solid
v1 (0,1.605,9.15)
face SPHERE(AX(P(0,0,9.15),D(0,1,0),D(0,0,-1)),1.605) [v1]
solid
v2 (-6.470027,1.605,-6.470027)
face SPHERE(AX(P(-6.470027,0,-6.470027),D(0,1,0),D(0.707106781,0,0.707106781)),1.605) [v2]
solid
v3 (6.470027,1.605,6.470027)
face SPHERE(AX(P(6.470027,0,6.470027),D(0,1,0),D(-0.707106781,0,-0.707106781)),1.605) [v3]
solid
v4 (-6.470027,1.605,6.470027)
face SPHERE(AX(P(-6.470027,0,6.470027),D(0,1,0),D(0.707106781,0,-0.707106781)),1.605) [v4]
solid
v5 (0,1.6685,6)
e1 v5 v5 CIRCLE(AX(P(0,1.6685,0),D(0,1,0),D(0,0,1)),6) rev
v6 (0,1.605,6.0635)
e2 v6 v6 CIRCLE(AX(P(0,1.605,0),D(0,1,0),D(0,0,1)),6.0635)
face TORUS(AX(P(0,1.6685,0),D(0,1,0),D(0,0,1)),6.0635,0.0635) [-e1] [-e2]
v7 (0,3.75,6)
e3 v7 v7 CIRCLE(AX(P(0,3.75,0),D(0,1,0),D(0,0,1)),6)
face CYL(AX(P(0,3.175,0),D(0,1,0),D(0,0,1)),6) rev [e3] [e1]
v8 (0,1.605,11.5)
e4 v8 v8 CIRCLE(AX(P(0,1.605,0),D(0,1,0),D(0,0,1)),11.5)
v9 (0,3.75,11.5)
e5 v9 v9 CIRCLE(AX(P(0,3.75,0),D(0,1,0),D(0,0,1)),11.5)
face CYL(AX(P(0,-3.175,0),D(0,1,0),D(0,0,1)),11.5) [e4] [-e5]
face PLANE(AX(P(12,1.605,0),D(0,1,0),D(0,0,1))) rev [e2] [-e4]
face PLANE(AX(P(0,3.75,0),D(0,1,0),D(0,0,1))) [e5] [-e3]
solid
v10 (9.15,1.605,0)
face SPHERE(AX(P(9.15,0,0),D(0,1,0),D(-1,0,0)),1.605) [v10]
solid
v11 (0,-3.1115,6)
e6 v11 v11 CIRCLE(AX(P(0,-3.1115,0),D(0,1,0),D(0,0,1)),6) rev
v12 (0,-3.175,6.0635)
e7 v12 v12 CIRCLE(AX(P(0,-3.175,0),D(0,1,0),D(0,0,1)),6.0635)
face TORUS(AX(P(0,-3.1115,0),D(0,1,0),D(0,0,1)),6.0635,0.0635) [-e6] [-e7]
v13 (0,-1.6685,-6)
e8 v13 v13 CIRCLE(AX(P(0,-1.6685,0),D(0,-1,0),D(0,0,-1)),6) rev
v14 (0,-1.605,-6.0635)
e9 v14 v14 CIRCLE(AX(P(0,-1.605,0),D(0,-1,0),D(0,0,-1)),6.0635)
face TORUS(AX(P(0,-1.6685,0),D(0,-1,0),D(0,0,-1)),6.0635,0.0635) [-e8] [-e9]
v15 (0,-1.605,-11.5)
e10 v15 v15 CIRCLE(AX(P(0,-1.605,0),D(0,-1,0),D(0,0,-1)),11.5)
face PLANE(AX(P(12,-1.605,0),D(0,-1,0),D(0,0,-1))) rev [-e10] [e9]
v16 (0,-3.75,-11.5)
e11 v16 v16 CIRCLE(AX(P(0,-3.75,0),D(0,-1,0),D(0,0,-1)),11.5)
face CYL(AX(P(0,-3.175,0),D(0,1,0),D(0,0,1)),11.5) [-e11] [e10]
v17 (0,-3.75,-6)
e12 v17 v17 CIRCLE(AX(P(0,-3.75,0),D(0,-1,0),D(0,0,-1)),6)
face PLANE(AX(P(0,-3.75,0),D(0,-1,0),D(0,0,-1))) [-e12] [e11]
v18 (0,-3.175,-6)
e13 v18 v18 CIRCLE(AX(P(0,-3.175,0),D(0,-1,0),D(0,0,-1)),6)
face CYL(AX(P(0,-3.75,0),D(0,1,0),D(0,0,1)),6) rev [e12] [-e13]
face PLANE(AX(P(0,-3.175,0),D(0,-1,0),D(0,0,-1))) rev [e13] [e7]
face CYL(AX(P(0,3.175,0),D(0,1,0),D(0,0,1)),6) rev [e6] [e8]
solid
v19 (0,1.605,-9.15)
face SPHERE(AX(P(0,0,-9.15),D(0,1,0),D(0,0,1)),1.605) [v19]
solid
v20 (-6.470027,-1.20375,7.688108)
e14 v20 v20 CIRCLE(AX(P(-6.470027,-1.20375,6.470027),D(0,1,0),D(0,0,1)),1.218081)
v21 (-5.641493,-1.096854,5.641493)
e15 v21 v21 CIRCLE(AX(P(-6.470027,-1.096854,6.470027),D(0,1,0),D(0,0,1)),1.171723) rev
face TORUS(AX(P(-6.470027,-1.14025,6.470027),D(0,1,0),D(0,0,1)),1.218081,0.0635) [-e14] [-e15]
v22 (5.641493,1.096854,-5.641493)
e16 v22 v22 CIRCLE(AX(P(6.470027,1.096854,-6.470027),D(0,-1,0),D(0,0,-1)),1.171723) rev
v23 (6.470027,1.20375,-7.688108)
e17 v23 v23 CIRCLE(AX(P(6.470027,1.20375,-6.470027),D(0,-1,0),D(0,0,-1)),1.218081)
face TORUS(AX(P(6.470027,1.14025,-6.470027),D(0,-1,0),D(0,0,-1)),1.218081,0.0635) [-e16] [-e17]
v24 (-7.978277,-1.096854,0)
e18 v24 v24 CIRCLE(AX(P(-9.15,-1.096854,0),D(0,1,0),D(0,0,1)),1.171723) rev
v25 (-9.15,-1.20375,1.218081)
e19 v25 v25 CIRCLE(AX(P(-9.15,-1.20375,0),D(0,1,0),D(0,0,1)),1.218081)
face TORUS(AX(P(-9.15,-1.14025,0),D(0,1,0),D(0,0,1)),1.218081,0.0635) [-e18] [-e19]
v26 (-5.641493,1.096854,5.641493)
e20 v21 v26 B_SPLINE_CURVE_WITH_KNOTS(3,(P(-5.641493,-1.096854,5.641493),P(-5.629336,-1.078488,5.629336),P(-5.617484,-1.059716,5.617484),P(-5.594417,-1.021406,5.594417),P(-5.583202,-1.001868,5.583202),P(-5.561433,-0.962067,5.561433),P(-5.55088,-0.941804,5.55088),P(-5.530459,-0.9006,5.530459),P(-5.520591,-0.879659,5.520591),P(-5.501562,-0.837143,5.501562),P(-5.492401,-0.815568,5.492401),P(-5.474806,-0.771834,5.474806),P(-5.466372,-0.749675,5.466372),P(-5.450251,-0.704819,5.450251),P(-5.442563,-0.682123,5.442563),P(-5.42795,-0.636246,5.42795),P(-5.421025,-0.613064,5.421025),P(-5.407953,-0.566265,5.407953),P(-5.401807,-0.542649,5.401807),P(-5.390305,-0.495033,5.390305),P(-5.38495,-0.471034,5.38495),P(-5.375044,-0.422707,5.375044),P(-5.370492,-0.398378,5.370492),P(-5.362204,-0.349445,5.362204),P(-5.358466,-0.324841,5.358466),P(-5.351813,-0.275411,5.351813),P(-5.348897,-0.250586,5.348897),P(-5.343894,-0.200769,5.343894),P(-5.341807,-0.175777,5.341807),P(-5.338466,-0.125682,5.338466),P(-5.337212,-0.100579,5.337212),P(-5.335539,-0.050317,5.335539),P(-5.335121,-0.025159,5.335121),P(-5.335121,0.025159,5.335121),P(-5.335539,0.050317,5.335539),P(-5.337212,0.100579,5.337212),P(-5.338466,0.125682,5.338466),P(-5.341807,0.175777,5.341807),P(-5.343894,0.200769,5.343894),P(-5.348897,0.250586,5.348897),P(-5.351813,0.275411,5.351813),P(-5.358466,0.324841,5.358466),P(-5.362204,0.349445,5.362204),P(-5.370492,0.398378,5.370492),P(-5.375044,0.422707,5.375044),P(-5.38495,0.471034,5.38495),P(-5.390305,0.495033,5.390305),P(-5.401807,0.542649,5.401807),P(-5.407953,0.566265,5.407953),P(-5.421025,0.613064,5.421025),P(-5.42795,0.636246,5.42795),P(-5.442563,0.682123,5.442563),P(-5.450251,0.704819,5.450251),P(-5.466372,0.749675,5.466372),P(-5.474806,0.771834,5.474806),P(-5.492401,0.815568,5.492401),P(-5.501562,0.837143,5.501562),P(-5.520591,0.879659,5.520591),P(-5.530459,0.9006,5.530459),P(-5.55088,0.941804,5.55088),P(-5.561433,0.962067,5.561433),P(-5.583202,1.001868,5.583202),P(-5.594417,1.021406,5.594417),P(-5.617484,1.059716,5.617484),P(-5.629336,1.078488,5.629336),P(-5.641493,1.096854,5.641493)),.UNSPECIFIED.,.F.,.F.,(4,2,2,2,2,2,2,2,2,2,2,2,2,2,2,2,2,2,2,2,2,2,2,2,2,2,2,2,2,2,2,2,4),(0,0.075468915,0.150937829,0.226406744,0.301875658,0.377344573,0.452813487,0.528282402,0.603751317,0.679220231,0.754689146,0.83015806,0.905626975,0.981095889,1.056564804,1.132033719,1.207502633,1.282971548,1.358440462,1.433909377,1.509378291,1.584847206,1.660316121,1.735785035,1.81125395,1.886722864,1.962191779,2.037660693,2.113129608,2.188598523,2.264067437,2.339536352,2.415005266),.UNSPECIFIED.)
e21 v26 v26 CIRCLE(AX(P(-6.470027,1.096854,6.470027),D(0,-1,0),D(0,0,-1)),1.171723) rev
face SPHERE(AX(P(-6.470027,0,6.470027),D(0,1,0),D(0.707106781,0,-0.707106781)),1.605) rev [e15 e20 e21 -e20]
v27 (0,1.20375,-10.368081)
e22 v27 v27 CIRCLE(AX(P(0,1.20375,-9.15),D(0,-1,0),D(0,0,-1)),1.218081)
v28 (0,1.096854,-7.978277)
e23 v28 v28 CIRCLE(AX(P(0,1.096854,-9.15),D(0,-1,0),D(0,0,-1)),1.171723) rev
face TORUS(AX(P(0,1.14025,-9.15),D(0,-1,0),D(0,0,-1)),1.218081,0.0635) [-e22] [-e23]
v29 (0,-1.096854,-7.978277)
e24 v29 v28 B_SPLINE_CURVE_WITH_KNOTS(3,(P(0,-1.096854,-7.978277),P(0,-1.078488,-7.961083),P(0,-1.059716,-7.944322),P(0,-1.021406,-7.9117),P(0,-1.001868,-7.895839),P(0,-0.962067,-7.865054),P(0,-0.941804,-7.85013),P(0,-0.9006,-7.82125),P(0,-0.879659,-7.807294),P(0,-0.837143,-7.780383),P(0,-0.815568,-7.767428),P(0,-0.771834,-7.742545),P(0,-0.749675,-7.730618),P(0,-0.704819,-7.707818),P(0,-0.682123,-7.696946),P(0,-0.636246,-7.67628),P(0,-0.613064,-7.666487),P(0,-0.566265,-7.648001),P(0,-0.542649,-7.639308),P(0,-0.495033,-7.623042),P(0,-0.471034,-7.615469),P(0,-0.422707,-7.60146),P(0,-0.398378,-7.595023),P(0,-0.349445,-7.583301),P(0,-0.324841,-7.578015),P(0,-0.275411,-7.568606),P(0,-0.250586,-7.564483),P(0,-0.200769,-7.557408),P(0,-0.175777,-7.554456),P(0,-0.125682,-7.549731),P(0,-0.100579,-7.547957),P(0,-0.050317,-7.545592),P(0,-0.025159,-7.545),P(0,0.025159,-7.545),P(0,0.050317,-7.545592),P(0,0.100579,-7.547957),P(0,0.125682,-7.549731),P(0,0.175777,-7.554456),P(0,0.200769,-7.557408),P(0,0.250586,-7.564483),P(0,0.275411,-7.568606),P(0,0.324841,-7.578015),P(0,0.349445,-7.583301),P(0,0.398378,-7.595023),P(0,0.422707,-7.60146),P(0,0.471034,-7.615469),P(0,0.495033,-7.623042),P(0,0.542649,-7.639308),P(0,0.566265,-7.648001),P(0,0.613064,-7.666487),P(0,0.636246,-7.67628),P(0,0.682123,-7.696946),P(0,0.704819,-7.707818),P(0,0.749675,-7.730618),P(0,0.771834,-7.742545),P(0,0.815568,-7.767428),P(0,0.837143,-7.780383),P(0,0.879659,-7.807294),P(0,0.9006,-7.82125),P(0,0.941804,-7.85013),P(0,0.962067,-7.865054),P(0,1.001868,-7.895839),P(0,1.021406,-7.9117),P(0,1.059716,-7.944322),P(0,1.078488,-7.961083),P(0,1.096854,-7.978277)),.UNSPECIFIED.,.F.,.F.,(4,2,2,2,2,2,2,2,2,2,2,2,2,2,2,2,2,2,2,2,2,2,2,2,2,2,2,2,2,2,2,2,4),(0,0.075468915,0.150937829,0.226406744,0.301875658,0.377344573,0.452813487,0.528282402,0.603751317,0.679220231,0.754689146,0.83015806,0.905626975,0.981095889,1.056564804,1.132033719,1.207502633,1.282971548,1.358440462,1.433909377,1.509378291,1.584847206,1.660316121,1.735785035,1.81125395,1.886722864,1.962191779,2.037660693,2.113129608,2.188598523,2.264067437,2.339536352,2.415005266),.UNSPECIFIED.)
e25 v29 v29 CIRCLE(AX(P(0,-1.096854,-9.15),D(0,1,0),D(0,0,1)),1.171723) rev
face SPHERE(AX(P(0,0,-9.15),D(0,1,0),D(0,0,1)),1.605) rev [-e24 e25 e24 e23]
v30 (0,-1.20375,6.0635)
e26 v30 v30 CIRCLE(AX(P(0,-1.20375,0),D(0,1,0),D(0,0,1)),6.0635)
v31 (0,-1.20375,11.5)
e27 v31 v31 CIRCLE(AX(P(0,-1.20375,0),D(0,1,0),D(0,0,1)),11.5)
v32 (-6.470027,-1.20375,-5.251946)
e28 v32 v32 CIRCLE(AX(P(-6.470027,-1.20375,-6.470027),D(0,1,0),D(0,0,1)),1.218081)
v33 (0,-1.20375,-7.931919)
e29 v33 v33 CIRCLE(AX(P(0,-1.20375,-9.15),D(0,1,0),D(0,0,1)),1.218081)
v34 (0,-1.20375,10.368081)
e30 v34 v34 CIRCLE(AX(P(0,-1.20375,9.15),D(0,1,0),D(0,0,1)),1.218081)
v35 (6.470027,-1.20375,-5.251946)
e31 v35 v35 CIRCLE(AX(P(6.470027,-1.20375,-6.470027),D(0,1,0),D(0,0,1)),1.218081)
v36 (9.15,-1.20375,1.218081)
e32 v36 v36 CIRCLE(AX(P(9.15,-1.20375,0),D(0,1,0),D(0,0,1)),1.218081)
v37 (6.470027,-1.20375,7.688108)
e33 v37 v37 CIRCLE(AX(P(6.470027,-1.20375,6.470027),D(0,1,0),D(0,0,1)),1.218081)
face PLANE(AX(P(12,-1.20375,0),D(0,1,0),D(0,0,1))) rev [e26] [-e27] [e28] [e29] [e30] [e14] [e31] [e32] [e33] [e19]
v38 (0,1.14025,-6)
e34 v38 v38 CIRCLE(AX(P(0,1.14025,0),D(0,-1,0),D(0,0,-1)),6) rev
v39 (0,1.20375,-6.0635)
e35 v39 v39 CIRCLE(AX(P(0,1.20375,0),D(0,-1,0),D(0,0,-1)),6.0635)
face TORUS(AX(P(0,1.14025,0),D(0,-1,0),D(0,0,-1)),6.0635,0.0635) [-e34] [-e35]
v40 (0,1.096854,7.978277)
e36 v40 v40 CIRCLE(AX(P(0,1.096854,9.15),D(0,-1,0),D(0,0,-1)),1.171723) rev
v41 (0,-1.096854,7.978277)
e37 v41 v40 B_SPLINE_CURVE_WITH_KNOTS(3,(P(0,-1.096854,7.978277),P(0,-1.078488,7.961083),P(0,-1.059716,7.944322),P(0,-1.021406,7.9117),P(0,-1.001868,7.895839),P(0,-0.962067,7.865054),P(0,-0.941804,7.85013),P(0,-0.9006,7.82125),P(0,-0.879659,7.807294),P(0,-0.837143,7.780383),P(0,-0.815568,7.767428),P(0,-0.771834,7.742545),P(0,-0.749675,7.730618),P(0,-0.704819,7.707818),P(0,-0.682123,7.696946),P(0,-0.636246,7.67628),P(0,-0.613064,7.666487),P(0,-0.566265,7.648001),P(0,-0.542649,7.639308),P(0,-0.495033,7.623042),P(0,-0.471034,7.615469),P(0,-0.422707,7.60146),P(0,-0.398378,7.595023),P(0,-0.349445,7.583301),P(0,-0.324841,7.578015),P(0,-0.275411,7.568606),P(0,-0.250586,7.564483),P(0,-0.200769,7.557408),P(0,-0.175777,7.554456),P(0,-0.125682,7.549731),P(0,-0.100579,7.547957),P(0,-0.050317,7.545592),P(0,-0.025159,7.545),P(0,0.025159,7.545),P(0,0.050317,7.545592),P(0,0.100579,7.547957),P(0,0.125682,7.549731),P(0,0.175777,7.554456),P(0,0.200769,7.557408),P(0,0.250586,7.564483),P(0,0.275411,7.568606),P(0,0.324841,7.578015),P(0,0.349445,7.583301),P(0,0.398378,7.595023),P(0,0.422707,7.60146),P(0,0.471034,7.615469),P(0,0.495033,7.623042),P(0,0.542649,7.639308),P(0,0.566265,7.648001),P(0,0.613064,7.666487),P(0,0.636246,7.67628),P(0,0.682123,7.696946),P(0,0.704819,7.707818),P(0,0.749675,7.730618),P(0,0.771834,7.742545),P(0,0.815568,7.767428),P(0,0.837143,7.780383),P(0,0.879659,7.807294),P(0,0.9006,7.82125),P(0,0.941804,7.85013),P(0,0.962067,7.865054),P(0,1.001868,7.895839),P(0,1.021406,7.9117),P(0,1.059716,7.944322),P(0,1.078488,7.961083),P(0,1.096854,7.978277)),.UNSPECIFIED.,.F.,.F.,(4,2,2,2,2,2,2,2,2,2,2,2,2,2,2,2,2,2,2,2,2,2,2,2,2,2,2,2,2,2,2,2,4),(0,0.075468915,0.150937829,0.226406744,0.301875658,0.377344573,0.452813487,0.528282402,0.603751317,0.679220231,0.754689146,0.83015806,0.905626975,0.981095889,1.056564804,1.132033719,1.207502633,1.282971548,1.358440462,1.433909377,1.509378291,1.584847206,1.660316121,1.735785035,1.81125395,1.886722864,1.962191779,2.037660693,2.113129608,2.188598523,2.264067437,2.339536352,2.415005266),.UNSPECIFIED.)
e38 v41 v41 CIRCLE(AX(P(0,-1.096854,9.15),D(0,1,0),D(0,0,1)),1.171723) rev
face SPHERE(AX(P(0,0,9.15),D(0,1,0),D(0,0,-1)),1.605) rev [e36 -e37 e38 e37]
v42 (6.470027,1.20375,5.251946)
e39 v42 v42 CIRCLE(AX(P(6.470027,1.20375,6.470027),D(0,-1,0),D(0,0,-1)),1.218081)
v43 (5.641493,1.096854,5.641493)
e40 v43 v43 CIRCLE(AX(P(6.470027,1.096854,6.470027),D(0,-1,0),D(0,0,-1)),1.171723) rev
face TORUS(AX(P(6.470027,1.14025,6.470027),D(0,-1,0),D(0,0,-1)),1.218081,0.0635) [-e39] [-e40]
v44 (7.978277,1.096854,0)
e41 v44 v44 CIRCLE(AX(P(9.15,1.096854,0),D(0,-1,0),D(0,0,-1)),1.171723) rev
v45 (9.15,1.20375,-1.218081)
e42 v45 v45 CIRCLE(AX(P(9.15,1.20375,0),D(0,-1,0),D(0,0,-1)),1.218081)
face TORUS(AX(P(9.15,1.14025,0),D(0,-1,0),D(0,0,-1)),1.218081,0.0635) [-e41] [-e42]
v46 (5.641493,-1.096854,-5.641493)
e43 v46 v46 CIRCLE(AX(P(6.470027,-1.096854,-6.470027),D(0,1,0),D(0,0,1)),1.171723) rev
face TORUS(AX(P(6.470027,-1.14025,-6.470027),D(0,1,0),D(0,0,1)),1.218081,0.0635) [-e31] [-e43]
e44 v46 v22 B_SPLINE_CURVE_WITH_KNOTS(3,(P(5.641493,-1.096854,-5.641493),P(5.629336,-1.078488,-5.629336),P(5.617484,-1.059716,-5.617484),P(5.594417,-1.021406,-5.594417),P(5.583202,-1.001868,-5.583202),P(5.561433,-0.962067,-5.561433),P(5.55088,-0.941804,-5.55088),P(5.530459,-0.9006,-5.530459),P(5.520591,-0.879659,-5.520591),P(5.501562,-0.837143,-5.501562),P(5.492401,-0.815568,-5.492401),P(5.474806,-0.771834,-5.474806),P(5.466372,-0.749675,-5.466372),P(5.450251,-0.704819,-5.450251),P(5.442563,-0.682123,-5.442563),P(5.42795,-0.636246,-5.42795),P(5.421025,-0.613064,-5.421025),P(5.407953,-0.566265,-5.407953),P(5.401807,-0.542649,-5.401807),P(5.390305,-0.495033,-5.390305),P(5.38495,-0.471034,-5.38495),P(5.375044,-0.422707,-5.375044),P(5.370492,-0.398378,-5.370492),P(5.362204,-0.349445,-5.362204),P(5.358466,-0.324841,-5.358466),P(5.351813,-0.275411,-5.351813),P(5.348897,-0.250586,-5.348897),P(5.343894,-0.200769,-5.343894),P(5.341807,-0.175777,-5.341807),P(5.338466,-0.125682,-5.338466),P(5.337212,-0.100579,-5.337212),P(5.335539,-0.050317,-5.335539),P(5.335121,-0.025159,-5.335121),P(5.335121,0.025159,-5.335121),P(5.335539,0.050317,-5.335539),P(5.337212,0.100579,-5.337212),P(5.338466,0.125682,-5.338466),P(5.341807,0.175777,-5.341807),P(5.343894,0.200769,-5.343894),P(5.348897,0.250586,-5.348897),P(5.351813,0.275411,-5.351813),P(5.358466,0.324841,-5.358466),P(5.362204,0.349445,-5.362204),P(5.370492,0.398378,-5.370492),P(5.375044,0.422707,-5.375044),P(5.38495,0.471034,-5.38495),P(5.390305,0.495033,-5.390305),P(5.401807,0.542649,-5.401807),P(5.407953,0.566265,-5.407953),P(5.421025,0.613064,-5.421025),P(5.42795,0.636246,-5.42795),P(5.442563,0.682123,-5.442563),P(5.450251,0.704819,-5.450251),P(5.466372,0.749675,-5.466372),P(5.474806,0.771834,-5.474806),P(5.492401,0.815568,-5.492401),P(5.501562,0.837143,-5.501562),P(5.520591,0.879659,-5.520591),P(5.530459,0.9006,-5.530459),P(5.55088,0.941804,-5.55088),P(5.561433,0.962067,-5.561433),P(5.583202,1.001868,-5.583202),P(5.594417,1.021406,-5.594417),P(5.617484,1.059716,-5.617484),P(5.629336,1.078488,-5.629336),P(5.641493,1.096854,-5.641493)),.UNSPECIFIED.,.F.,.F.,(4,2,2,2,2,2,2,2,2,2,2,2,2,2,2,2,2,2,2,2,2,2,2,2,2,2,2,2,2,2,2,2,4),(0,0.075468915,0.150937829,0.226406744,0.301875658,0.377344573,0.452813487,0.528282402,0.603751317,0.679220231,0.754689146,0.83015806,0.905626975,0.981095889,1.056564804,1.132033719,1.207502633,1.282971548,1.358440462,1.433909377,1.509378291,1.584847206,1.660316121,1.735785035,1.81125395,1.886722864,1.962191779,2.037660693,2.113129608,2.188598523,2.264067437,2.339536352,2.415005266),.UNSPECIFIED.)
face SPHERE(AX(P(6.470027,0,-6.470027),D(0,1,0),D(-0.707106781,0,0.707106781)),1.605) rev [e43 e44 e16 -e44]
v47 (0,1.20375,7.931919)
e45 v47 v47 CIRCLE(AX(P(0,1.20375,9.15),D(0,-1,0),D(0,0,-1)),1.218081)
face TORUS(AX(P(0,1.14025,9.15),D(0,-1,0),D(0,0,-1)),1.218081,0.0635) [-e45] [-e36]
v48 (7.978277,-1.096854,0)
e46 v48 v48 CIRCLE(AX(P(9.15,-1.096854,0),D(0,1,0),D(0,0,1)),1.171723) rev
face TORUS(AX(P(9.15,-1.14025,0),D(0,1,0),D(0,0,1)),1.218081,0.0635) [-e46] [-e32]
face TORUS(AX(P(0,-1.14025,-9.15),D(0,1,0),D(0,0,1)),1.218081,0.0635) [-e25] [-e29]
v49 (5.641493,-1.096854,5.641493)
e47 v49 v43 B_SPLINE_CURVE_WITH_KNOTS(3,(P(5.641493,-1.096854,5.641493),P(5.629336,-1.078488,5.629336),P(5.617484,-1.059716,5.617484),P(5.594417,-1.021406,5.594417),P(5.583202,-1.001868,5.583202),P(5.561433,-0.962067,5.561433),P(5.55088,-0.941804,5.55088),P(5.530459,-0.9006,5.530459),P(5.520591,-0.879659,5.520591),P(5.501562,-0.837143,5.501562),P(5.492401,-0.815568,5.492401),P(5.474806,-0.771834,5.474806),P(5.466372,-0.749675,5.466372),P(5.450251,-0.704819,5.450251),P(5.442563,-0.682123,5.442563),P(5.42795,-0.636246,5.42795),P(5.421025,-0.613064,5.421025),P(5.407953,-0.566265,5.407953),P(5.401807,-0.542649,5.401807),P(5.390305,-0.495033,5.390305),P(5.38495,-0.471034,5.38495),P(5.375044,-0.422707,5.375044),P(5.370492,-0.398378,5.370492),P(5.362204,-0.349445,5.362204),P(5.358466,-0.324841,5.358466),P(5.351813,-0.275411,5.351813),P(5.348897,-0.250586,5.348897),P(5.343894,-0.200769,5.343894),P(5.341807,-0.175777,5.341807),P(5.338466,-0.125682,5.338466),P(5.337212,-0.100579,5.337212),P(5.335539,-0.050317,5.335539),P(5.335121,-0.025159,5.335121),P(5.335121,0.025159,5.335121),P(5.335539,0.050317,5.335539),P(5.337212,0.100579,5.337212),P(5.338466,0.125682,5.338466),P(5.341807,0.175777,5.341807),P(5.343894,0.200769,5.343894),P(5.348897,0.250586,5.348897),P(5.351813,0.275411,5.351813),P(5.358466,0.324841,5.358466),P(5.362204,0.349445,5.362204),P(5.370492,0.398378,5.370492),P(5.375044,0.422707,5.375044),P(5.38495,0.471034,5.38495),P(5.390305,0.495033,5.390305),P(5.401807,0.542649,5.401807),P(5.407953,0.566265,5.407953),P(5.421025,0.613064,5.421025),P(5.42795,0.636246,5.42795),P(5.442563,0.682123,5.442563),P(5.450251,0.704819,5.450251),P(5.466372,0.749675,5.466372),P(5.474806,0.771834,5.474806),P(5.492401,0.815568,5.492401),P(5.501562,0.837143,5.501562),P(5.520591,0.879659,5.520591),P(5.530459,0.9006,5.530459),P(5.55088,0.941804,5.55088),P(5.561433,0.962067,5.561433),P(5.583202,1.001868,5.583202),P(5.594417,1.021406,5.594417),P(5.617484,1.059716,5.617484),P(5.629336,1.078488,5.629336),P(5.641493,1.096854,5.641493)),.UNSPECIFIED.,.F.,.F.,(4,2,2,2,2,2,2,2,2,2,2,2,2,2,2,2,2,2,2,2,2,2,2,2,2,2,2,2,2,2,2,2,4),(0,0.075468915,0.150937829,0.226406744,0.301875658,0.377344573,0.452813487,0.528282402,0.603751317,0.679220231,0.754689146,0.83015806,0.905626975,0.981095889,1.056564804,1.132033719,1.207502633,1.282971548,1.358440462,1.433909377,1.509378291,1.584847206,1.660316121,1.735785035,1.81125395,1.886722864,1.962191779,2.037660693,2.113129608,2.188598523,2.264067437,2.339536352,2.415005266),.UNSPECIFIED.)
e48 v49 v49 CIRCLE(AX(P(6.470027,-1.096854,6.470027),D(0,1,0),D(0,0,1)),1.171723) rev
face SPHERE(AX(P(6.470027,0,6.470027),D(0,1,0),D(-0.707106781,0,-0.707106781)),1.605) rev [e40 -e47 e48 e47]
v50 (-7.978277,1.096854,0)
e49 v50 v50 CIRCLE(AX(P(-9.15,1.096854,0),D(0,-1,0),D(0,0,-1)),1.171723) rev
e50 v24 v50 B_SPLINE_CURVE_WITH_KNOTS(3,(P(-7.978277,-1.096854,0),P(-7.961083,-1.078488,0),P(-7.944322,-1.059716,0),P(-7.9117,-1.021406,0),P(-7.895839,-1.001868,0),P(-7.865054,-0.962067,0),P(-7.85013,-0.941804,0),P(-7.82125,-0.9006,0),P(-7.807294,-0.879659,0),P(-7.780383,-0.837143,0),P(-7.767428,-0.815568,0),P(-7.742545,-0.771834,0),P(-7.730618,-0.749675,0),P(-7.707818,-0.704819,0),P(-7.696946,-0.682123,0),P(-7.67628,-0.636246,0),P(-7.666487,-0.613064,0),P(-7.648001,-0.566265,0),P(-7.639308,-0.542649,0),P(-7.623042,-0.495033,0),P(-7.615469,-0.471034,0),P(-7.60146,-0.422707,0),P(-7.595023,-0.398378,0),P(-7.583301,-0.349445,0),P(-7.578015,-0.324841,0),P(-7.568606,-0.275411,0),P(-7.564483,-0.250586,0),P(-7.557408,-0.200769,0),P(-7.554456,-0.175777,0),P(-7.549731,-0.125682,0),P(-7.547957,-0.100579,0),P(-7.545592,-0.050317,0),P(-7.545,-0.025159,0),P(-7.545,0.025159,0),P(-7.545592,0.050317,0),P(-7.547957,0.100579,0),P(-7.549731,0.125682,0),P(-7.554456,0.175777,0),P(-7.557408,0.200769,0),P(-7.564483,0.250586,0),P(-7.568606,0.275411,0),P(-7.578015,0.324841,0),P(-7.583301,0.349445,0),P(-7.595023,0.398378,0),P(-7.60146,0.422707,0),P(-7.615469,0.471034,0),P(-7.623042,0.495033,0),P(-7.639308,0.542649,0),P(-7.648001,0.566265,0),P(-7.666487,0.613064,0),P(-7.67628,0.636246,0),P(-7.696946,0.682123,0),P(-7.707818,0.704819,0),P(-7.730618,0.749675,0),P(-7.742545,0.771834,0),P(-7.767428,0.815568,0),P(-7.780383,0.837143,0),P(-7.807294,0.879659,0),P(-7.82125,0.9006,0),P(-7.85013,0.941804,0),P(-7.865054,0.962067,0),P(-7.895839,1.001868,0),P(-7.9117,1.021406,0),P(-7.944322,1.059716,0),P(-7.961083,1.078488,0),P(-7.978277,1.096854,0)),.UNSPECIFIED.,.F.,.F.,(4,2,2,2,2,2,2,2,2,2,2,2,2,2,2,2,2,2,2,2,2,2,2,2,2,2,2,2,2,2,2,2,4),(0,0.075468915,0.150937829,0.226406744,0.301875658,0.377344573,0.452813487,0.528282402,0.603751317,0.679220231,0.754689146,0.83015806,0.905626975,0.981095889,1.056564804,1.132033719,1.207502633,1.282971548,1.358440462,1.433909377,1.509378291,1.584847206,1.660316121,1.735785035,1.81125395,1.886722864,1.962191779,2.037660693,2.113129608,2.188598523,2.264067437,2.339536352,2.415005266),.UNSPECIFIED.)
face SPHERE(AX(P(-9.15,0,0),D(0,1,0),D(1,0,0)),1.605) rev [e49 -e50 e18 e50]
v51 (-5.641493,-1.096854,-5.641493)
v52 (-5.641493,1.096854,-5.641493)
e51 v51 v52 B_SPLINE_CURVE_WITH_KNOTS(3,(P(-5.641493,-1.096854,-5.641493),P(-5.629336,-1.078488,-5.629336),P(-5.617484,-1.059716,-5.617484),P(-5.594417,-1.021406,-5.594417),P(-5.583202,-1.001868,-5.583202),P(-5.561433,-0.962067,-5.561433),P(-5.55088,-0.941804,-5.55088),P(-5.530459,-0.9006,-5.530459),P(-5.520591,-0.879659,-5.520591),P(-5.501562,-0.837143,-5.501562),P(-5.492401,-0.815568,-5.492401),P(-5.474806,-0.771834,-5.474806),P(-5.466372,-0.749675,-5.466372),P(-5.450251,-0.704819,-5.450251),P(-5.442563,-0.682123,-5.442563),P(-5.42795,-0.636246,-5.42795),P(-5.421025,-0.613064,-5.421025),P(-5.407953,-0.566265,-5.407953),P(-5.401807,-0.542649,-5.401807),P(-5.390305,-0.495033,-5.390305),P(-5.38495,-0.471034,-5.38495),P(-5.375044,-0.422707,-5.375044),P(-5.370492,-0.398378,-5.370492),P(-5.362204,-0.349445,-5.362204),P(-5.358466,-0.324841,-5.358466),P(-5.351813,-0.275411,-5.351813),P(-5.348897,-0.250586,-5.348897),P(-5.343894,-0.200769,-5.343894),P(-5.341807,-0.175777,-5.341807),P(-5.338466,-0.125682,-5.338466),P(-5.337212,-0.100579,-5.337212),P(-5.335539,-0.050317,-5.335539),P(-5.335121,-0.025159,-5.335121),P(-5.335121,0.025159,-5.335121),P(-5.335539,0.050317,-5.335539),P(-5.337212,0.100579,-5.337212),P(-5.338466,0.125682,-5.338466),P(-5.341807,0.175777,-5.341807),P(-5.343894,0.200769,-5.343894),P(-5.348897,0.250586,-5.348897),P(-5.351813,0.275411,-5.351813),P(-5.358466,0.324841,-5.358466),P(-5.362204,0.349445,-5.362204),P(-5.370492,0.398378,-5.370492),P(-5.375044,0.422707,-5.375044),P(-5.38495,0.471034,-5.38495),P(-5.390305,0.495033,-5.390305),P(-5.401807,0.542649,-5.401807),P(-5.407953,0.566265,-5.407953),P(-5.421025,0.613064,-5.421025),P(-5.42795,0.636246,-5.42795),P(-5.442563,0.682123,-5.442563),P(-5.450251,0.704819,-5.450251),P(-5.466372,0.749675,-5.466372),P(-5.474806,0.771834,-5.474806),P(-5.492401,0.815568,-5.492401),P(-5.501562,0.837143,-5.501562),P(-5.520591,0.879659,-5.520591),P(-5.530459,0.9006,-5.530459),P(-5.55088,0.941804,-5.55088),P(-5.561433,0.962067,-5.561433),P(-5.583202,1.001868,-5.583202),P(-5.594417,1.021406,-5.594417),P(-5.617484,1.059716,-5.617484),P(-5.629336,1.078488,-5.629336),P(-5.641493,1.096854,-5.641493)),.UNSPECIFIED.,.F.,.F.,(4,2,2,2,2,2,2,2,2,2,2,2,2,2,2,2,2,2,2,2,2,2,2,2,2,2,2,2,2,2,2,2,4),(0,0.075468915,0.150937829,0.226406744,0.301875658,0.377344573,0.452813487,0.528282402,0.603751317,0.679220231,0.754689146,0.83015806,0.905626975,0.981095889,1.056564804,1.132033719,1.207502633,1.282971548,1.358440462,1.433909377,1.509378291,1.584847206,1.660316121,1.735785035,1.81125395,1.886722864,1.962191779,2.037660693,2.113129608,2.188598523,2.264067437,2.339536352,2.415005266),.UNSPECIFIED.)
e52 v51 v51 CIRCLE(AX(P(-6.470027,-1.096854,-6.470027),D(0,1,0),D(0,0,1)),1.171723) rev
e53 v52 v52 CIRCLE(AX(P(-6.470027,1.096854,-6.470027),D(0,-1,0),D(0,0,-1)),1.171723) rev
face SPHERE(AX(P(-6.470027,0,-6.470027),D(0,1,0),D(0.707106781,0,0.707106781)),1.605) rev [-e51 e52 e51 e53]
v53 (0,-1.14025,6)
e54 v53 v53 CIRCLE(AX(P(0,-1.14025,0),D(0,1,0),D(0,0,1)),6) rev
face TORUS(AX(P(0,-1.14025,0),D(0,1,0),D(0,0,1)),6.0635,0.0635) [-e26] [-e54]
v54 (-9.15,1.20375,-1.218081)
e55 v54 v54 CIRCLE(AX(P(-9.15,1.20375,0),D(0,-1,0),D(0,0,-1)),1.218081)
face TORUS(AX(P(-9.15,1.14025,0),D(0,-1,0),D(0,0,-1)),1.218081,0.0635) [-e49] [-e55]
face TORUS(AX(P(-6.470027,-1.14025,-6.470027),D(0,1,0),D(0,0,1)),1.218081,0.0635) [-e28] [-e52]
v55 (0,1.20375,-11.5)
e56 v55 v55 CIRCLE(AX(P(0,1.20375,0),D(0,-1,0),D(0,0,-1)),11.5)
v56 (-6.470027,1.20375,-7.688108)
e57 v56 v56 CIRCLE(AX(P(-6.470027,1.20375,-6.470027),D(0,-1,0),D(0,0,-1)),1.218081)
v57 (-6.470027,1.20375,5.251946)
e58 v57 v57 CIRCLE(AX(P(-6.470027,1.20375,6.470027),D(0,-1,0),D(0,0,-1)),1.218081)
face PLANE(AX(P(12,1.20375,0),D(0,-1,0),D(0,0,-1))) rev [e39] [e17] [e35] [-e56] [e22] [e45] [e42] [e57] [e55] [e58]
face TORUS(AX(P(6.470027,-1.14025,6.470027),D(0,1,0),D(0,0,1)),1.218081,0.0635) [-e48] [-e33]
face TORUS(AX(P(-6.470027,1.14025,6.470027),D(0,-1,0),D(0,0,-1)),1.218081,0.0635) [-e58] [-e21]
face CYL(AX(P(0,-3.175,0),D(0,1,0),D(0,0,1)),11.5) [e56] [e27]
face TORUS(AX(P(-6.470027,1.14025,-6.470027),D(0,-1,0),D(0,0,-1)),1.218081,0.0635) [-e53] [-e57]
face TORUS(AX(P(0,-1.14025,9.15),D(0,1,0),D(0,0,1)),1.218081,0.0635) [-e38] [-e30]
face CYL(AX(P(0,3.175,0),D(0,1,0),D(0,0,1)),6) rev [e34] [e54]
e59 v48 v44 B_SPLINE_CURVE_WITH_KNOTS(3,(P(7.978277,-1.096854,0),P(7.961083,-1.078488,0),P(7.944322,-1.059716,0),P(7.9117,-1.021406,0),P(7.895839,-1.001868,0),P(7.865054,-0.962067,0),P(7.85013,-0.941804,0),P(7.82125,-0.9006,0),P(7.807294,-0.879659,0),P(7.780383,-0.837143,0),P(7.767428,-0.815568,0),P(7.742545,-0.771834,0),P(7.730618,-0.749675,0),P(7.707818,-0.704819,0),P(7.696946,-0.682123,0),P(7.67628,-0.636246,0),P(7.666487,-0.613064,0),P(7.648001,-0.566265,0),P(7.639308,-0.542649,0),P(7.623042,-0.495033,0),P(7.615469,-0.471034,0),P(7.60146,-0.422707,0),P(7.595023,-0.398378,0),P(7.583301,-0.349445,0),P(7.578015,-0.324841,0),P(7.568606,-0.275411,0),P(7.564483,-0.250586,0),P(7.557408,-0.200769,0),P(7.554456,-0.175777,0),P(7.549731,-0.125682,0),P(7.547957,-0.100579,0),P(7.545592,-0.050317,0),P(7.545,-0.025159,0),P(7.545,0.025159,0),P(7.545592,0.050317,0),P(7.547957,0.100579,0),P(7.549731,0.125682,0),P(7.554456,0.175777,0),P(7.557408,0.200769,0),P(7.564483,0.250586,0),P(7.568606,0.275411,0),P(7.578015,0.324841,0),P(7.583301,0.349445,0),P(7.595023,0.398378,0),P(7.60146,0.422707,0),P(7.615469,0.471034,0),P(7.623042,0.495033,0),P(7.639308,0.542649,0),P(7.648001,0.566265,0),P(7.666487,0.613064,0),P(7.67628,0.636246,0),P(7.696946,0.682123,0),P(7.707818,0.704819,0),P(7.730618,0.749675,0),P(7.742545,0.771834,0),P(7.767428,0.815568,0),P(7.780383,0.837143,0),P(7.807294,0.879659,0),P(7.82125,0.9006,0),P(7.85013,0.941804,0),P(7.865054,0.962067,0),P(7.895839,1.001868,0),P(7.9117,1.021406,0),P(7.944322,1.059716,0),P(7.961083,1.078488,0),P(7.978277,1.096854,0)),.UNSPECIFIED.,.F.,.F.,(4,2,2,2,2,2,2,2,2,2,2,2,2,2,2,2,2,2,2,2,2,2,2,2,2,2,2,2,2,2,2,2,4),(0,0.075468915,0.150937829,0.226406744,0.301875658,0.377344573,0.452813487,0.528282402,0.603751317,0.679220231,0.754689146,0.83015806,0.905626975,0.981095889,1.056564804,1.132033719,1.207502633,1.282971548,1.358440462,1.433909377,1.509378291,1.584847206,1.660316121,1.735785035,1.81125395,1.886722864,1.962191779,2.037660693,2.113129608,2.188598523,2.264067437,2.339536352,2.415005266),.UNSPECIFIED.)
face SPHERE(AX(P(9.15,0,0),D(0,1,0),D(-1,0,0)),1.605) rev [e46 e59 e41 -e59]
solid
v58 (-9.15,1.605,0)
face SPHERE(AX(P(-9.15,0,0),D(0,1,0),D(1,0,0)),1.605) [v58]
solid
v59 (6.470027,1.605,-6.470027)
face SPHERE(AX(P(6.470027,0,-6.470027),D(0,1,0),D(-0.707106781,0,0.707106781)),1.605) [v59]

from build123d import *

# Parameters (mm, degrees)
SKETCH3_W                = 6
SKETCH3_H                = 2.4075
CIRPATTERN1_COUNT        = 8
CIRPATTERN1_ANGLE        = 315
CIRPATTERN2_COUNT        = 8
SKETCH6_W                = 6
SKETCH6_H                = 1.57
FILLET1_R                = 0.0635
FILLET2_R                = 0.0635
FILLET3_R                = 0.0635
CUT_EXTRUDE1_DEPTH       = 19.119671798
CUT_EXTRUDE1_DEPTH_BACK  = 19.119671798
SKETCH7_R                = 12.5
SKETCH7_R_2              = 11.5
BOSS_EXTRUDE1_DEPTH      = 0.575
BOSS_EXTRUDE1_DEPTH_BACK = 0.3
SKETCH8_R                = 11.5
SKETCH8_R_2              = 6
SKETCH9_R                = 11.5
SKETCH9_R_2              = 6
BOSS_EXTRUDE2_DEPTH      = 0.575


with BuildPart() as part:
    # Sketch3 → Revolve1 (revolve)
    with BuildSketch(Plane.XY):
        with Locations((9, 0)):
            Rectangle(SKETCH3_W, SKETCH3_H)
    revolve(axis=Axis((0, 3.175, 0), (0, -1, 0)))

    # Sketch4 → Cut-Revolve1 (revolve, cut)
    with BuildSketch(Plane.XY):
        with BuildLine():
            Line((9.15, 1.605), (9.15, -1.605))
            ThreePointArc((9.15, -1.605), (7.545, 0), (9.15, 1.605))
        make_face()
    cut_revolve1 = revolve(axis=Axis((9.15, 1.605, 0), (0, -1, 0)), mode=Mode.SUBTRACT)

    # CirPattern2: Cut-Revolve1 ×8 about axis
    cirpattern2_axis = Axis((0, 3.175, 0), (0, -1, 0))
    for i in range(1, CIRPATTERN2_COUNT):
        add(cut_revolve1.rotate(cirpattern2_axis, i * 360 / CIRPATTERN2_COUNT), mode=Mode.SUBTRACT)

    # Fillet2
    fillet2_edges = [part.edges().sort_by_distance(p)[0] for p in [
        (-6, -1.20375, 0),
        (-12, -1.20375, 0),
        (10.211607714, -1.20375, 0),
        (7.220697061, -1.20375, 7.220697061),
        (0, -1.20375, 10.211607714),
        (-7.220697061, -1.20375, 7.220697061),
        (-10.211607714, -1.20375, 0),
        (-7.220697061, -1.20375, -7.220697061),
        (0, -1.20375, -10.211607714),
        (-12, 1.20375, 0),
        (-6, 1.20375, 0),
        (10.211607714, 1.20375, 0),
        (7.220697061, 1.20375, 7.220697061),
        (0, 1.20375, 10.211607714),
        (-7.220697061, 1.20375, 7.220697061),
        (-10.211607714, 1.20375, 0),
        (-7.220697061, 1.20375, -7.220697061),
        (0, 1.20375, -10.211607714),
        (7.220697061, -1.20375, -7.220697061),
        (7.220697061, 1.20375, -7.220697061),
    ]]
    fillet(fillet2_edges, radius=FILLET2_R)


with BuildPart() as body_2:
    # Sketch5 → Revolve2 (revolve)
    with BuildSketch(Plane.XY):
        with BuildLine():
            Line((9.15, 1.605), (9.15, -1.605))
            ThreePointArc((9.15, -1.605), (7.545, 0), (9.15, 1.605))
        make_face()
    revolve(axis=Axis((9.15, 1.605, 0), (0, -1, 0)))


with BuildPart() as cirpattern1_1:
    # CirPattern1: pattern copy
    add(body_2.part.rotate(Axis((0, 3.175, 0), (0, -1, 0)), 1 * CIRPATTERN1_ANGLE / (CIRPATTERN1_COUNT - 1)))


with BuildPart() as cirpattern1_2:
    # CirPattern1: pattern copy
    add(body_2.part.rotate(Axis((0, 3.175, 0), (0, -1, 0)), 2 * CIRPATTERN1_ANGLE / (CIRPATTERN1_COUNT - 1)))


with BuildPart() as cirpattern1_3:
    # CirPattern1: pattern copy
    add(body_2.part.rotate(Axis((0, 3.175, 0), (0, -1, 0)), 3 * CIRPATTERN1_ANGLE / (CIRPATTERN1_COUNT - 1)))


with BuildPart() as cirpattern1_4:
    # CirPattern1: pattern copy
    add(body_2.part.rotate(Axis((0, 3.175, 0), (0, -1, 0)), 4 * CIRPATTERN1_ANGLE / (CIRPATTERN1_COUNT - 1)))


with BuildPart() as cirpattern1_5:
    # CirPattern1: pattern copy
    add(body_2.part.rotate(Axis((0, 3.175, 0), (0, -1, 0)), 5 * CIRPATTERN1_ANGLE / (CIRPATTERN1_COUNT - 1)))


with BuildPart() as cirpattern1_6:
    # CirPattern1: pattern copy
    add(body_2.part.rotate(Axis((0, 3.175, 0), (0, -1, 0)), 6 * CIRPATTERN1_ANGLE / (CIRPATTERN1_COUNT - 1)))


with BuildPart() as cirpattern1_7:
    # CirPattern1: pattern copy
    add(body_2.part.rotate(Axis((0, 3.175, 0), (0, -1, 0)), 7 * CIRPATTERN1_ANGLE / (CIRPATTERN1_COUNT - 1)))


with BuildPart() as body_10:
    # Sketch6 → Revolve3 (revolve)
    with BuildSketch(Plane.XY):
        with Locations((9, 2.39)):
            Rectangle(SKETCH6_W, SKETCH6_H)
        with Locations((9, -2.39)):
            Rectangle(SKETCH6_W, SKETCH6_H)
    revolve(axis=Axis((0, 3.175, 0), (0, -1, 0)))

    # Fillet1
    fillet1_edges = [body_10.edges().sort_by_distance(p)[0] for p in [
        (-6, 1.605, 0),
        (-12, 1.605, 0),
        (-12, 3.175, 0),
        (-6, 3.175, 0),
    ]]
    fillet(fillet1_edges, radius=FILLET1_R)

    # Fillet3
    fillet3_edges = [body_10.edges().sort_by_distance(p)[0] for p in [
        (-12, -1.605, 0),
        (-6, -1.605, 0),
        (-6, -3.175, 0),
        (-12, -3.175, 0),
    ]]
    fillet(fillet3_edges, radius=FILLET3_R)


with BuildPart() as cut_extrude1_tool:
    # Sketch7 → Cut-Extrude1 (new, two sides: drawn at the far end of the back side and taken through both)
    with BuildSketch(Plane(origin=(0, 3.175, 0), x_dir=(1, 0, 0), z_dir=(0, 1, 0)).offset(-CUT_EXTRUDE1_DEPTH_BACK)):
        Circle(SKETCH7_R)
        Circle(SKETCH7_R_2, mode=Mode.SUBTRACT)
    extrude(amount=CUT_EXTRUDE1_DEPTH + CUT_EXTRUDE1_DEPTH_BACK)


with BuildPart() as part_1:
    add(part.part)

    # Cut-Extrude1: cut by cut_extrude1_tool
    add(cut_extrude1_tool.part, mode=Mode.SUBTRACT)


with BuildPart() as body_10_1:
    add(body_10.part)

    # Cut-Extrude1: cut by cut_extrude1_tool
    add(cut_extrude1_tool.part, mode=Mode.SUBTRACT)

    # Sketch8 → Boss-Extrude1 (add, two sides: drawn at the far end of the back side and taken through both)
    with BuildSketch(Plane(origin=(0, 3.175, 0), x_dir=(1, 0, 0), z_dir=(0, 1, 0)).offset(-BOSS_EXTRUDE1_DEPTH_BACK)):
        Circle(SKETCH8_R)
        Circle(SKETCH8_R_2, mode=Mode.SUBTRACT)
    extrude(amount=BOSS_EXTRUDE1_DEPTH + BOSS_EXTRUDE1_DEPTH_BACK)

    # Sketch9 → Boss-Extrude2 (add)
    with BuildSketch(Plane.XZ.offset(3.175)):
        Circle(SKETCH9_R)
        Circle(SKETCH9_R_2, mode=Mode.SUBTRACT)
    extrude(amount=BOSS_EXTRUDE2_DEPTH)


solid = Compound([body_2.part, cirpattern1_1.part, cirpattern1_2.part, cirpattern1_3.part, cirpattern1_4.part, cirpattern1_5.part, cirpattern1_6.part, cirpattern1_7.part, part_1.part, body_10_1.part])
